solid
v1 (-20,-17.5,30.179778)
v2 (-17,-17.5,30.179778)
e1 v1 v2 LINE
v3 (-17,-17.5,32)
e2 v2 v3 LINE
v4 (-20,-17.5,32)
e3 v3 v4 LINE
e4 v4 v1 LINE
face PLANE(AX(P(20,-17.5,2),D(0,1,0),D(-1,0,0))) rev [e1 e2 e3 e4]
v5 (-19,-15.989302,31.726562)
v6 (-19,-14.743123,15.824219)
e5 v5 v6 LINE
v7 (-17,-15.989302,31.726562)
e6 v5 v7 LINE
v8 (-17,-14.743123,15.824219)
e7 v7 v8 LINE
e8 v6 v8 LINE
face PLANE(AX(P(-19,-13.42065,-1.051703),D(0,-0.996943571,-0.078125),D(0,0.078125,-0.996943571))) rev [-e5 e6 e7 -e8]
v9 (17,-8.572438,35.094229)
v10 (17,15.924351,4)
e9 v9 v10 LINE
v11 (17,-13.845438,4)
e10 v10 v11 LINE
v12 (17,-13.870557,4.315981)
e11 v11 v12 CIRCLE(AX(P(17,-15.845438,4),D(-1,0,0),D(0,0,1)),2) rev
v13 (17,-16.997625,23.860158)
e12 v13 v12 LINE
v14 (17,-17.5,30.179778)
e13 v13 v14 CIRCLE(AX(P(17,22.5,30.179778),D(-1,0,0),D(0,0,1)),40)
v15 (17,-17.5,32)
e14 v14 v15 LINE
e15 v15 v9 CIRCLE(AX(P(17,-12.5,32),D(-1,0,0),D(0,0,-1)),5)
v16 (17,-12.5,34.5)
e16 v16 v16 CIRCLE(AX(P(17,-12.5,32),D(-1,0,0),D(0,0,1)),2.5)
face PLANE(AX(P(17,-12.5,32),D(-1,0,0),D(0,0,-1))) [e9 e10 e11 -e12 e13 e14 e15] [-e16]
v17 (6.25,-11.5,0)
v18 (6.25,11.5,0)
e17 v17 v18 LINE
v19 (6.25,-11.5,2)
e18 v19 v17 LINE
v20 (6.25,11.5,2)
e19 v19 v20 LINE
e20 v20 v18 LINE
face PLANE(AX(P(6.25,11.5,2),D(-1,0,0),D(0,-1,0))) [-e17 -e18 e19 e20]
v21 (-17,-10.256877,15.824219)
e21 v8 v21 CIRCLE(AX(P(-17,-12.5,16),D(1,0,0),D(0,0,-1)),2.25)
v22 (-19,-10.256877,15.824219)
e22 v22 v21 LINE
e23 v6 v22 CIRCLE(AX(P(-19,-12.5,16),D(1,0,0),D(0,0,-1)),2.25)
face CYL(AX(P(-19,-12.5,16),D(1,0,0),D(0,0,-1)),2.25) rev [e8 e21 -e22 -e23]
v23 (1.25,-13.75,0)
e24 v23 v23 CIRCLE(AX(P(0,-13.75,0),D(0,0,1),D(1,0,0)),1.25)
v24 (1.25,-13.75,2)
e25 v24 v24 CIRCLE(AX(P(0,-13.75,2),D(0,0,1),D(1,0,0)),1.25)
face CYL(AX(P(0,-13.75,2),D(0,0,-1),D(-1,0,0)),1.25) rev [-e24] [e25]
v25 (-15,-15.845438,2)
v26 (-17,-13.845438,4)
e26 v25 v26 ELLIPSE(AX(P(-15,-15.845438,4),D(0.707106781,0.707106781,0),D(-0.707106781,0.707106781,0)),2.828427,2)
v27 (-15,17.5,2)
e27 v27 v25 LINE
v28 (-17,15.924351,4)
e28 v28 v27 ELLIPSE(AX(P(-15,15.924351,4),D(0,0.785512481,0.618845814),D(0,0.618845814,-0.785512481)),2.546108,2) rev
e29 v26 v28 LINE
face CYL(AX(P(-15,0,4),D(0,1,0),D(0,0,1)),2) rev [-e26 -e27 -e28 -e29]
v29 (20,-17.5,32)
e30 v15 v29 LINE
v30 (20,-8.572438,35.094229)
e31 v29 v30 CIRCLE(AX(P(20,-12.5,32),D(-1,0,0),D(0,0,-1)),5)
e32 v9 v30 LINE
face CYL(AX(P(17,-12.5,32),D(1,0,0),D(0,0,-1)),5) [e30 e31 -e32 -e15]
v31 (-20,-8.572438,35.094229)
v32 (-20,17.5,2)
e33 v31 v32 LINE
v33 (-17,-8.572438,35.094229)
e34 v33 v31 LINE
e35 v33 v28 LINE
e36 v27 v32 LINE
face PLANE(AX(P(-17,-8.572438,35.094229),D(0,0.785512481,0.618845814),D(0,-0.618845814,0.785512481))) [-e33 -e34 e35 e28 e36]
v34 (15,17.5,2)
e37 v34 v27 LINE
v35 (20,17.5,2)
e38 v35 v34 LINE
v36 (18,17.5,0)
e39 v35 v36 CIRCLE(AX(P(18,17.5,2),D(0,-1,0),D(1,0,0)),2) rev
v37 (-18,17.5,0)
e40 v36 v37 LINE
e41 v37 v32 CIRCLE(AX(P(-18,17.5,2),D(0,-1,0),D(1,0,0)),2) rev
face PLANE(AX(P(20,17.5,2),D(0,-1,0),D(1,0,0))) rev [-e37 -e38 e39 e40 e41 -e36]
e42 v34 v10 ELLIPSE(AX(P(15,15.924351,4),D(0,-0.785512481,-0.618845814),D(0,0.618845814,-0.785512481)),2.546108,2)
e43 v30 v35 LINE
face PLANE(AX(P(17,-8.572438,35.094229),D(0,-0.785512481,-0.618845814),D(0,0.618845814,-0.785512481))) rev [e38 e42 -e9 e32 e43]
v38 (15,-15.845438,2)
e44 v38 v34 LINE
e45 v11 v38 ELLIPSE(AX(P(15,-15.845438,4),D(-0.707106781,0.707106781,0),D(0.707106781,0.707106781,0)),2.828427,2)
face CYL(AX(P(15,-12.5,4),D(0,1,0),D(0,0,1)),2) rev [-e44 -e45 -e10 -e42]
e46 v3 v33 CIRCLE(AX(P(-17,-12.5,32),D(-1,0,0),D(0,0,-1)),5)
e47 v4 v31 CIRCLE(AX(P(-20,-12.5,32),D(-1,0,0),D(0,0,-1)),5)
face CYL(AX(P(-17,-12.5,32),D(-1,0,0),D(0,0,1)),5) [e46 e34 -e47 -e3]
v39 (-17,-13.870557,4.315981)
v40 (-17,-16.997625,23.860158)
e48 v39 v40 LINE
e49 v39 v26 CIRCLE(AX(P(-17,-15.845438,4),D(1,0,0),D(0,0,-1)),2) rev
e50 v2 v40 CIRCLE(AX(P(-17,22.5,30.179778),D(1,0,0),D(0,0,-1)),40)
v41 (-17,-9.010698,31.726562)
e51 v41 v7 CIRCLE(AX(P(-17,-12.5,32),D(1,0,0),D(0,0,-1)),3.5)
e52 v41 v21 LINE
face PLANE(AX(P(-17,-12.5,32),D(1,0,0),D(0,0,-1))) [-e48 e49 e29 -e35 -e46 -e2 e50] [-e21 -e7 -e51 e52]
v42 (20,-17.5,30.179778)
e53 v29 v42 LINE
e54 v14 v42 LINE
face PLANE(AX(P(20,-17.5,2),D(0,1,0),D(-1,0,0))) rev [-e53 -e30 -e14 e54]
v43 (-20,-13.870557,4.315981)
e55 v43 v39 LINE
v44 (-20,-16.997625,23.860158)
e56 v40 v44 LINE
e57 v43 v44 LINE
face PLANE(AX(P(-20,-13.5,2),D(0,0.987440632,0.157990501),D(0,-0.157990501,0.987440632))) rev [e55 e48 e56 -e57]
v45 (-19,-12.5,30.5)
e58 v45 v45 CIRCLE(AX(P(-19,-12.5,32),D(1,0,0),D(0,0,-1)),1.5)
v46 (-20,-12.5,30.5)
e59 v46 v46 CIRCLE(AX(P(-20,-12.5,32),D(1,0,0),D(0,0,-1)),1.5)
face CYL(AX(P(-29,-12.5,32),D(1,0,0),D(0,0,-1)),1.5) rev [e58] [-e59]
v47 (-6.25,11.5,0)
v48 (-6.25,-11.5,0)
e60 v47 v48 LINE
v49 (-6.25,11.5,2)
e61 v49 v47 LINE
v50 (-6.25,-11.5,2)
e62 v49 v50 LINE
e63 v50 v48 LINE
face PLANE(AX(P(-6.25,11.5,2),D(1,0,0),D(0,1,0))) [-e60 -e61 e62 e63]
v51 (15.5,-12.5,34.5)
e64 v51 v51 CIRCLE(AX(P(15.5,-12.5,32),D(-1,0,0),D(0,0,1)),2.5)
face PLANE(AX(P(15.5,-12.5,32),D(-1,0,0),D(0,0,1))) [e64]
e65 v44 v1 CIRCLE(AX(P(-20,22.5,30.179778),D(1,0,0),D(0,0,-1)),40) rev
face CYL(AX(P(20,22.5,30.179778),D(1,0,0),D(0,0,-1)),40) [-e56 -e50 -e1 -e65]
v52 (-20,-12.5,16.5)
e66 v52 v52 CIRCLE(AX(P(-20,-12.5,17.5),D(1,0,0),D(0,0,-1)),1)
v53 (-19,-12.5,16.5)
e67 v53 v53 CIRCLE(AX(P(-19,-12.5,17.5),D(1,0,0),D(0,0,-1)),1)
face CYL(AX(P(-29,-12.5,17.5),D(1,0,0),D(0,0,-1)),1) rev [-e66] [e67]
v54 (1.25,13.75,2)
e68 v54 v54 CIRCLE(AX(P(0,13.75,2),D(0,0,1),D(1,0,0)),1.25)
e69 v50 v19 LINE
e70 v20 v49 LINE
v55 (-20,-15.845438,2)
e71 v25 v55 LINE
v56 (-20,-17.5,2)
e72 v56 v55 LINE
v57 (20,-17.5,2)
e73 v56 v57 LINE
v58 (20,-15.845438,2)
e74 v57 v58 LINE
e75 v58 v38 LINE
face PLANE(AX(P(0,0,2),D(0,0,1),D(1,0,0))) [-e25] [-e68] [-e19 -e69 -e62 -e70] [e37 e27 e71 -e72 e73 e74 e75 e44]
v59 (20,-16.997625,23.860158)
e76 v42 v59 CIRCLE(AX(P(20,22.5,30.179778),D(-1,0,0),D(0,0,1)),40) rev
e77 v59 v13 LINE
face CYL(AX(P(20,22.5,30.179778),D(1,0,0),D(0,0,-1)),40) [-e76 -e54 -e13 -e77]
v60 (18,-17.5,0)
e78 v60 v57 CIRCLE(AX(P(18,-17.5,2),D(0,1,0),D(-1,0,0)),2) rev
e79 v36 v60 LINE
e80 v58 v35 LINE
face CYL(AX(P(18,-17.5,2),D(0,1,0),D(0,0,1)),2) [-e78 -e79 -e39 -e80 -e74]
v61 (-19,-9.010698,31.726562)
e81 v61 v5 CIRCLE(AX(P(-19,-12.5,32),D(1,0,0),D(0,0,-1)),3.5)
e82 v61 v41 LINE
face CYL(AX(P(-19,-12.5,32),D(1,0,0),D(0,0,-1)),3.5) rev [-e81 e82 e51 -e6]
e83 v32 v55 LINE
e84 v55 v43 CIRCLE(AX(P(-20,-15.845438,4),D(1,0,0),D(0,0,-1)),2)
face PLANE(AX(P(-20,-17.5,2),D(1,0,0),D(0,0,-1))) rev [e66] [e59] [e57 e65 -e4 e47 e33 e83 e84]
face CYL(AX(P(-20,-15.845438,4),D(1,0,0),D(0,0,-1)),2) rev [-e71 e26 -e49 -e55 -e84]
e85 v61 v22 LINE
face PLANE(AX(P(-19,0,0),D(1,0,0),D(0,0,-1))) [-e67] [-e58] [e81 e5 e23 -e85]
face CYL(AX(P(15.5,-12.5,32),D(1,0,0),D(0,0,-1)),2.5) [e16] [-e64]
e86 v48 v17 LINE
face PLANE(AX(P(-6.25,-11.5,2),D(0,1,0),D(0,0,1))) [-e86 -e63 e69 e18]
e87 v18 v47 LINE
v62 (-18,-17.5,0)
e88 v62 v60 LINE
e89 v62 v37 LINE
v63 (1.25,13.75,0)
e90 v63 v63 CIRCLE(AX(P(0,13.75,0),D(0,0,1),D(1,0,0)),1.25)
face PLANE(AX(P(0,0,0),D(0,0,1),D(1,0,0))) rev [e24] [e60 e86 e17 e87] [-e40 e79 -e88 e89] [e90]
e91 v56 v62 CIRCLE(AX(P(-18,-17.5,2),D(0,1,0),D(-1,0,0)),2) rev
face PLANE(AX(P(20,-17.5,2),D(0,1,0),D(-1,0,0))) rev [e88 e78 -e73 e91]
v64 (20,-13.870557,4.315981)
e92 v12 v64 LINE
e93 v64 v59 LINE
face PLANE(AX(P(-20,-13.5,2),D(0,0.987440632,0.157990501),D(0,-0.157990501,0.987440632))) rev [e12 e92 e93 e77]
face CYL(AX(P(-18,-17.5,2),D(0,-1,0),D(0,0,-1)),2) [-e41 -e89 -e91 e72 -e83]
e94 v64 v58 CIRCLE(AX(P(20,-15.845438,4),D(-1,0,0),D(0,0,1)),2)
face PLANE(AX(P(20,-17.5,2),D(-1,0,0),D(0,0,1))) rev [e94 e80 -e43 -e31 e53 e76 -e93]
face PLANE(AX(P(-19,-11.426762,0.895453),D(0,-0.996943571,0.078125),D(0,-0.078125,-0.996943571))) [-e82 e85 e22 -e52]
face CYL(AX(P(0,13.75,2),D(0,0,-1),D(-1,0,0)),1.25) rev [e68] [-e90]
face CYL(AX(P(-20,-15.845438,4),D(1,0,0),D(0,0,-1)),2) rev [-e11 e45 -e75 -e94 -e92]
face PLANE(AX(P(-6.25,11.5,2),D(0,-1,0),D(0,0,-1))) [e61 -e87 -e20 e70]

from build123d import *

# Parameters (mm, degrees)
SKETCH_1_W          = 40
SKETCH_1_H          = 35
SKETCH_1_R          = 1.25
SKETCH_1_W_2        = 12.5
SKETCH_1_H_2        = 23
EXTRUDE_1_DEPTH     = 2
EXTRUDE_2_DEPTH     = 3
CUT_EXTRUDE_1_DEPTH = 2
SKETCH_4_R          = 2.5
EXTRUDE_3_DEPTH     = 1.5
CUT_EXTRUDE_2_DEPTH = 58.22979993
FILLET_1_R          = 40
SKETCH_6_R          = 1.5
CUT_EXTRUDE_3_DEPTH = 10
SKETCH_7_R          = 1
CUT_EXTRUDE_4_DEPTH = 10
FILLET_2_R          = 2


with BuildPart() as part:
    # 草图1 → 凸台-拉伸1 (new body)
    with BuildSketch(Plane.XY):
        Rectangle(SKETCH_1_W, SKETCH_1_H)
        with Locations((0, 13.75)):
            Circle(SKETCH_1_R, mode=Mode.SUBTRACT)
        with Locations((0, -13.75)):
            Circle(SKETCH_1_R, mode=Mode.SUBTRACT)
        Rectangle(SKETCH_1_W_2, SKETCH_1_H_2, mode=Mode.SUBTRACT)
    extrude(amount=EXTRUDE_1_DEPTH)

    # 草图2 → 凸台-拉伸2 (add)
    with BuildSketch(Plane.ZY.offset(20)):
        with BuildLine():
            Line((2, -17.5), (32, -17.5))
            ThreePointArc((32, -17.5), (36.724288943, -14.13740465), (35.094229072, -8.572437595))
            Line((35.094229072, -8.572437595), (2, 17.5))
            Line((2, 17.5), (2, -17.5))
        make_face()
    extrude_2 = extrude(amount=-EXTRUDE_2_DEPTH)

    # 草图3 → 切除-拉伸1 (cut)
    with BuildSketch(Plane(origin=(-17, 0, 0), x_dir=(0, 0, -1), z_dir=(1, 0, 0))):
        with BuildLine():
            Line((-15.82421875, -10.256876965), (-31.7265625, -9.0106975))
            ThreePointArc((-31.7265625, -9.0106975), (-35.5, -12.5), (-31.7265625, -15.9893025))
            Line((-31.7265625, -15.9893025), (-15.82421875, -14.743123035))
            ThreePointArc((-15.82421875, -14.743123035), (-13.75, -12.5), (-15.82421875, -10.256876965))
        make_face()
    extrude(amount=-CUT_EXTRUDE_1_DEPTH, mode=Mode.SUBTRACT)

    # 镜向3: 凸台-拉伸2 across plane
    add(extrude_2.mirror(Plane(origin=(0, 0, 0), x_dir=(0, 0, 1), z_dir=(1, 0, 0))))

    # 草图4 → 凸台-拉伸3 (add)
    with BuildSketch(Plane.ZY.offset(-17)):
        with Locations((32, -12.5)):
            Circle(SKETCH_4_R)
    extrude(amount=EXTRUDE_3_DEPTH)

    # 草图5 → 切除-拉伸2 (cut, through all)
    with BuildSketch(Plane(origin=(20, 0, 0), x_dir=(0, 0, -1), z_dir=(1, 0, 0))):
        Polygon((-2, -17.5), (-2, -13.5), (-27, -17.5), align=None)
    extrude(amount=-CUT_EXTRUDE_2_DEPTH, mode=Mode.SUBTRACT)

    # 圆角1
    fillet_1_edges = [part.edges().sort_by_distance(p)[0] for p in [
        (-18.5, -17.5, 27),
        (18.5, -17.5, 27),
    ]]
    fillet(fillet_1_edges, radius=FILLET_1_R)

    # 草图6 → 切除-拉伸3 (cut)
    with BuildSketch(Plane(origin=(-19, 0, 0), x_dir=(0, 0, -1), z_dir=(1, 0, 0))):
        with Locations((-32, -12.5)):
            Circle(SKETCH_6_R)
    extrude(amount=-CUT_EXTRUDE_3_DEPTH, mode=Mode.SUBTRACT)

    # 草图7 → 切除-拉伸4 (cut)
    with BuildSketch(Plane(origin=(-19, 0, 0), x_dir=(0, 0, -1), z_dir=(1, 0, 0))):
        with Locations((-17.5, -12.5)):
            Circle(SKETCH_7_R)
    extrude(amount=-CUT_EXTRUDE_4_DEPTH, mode=Mode.SUBTRACT)

    # 圆角2
    fillet_2_edges = [part.edges().sort_by_distance(p)[0] for p in [
        (17, 2, 2),
        (-17, 2, 2),
        (20, 0, 0),
        (-20, 0, 0),
        (18.5, -13.5, 2),
        (-18.5, -13.5, 2),
    ]]
    fillet(fillet_2_edges, radius=FILLET_2_R - 0.0001)  # a hair under: the kernel refuses the full size


solid = part.part
